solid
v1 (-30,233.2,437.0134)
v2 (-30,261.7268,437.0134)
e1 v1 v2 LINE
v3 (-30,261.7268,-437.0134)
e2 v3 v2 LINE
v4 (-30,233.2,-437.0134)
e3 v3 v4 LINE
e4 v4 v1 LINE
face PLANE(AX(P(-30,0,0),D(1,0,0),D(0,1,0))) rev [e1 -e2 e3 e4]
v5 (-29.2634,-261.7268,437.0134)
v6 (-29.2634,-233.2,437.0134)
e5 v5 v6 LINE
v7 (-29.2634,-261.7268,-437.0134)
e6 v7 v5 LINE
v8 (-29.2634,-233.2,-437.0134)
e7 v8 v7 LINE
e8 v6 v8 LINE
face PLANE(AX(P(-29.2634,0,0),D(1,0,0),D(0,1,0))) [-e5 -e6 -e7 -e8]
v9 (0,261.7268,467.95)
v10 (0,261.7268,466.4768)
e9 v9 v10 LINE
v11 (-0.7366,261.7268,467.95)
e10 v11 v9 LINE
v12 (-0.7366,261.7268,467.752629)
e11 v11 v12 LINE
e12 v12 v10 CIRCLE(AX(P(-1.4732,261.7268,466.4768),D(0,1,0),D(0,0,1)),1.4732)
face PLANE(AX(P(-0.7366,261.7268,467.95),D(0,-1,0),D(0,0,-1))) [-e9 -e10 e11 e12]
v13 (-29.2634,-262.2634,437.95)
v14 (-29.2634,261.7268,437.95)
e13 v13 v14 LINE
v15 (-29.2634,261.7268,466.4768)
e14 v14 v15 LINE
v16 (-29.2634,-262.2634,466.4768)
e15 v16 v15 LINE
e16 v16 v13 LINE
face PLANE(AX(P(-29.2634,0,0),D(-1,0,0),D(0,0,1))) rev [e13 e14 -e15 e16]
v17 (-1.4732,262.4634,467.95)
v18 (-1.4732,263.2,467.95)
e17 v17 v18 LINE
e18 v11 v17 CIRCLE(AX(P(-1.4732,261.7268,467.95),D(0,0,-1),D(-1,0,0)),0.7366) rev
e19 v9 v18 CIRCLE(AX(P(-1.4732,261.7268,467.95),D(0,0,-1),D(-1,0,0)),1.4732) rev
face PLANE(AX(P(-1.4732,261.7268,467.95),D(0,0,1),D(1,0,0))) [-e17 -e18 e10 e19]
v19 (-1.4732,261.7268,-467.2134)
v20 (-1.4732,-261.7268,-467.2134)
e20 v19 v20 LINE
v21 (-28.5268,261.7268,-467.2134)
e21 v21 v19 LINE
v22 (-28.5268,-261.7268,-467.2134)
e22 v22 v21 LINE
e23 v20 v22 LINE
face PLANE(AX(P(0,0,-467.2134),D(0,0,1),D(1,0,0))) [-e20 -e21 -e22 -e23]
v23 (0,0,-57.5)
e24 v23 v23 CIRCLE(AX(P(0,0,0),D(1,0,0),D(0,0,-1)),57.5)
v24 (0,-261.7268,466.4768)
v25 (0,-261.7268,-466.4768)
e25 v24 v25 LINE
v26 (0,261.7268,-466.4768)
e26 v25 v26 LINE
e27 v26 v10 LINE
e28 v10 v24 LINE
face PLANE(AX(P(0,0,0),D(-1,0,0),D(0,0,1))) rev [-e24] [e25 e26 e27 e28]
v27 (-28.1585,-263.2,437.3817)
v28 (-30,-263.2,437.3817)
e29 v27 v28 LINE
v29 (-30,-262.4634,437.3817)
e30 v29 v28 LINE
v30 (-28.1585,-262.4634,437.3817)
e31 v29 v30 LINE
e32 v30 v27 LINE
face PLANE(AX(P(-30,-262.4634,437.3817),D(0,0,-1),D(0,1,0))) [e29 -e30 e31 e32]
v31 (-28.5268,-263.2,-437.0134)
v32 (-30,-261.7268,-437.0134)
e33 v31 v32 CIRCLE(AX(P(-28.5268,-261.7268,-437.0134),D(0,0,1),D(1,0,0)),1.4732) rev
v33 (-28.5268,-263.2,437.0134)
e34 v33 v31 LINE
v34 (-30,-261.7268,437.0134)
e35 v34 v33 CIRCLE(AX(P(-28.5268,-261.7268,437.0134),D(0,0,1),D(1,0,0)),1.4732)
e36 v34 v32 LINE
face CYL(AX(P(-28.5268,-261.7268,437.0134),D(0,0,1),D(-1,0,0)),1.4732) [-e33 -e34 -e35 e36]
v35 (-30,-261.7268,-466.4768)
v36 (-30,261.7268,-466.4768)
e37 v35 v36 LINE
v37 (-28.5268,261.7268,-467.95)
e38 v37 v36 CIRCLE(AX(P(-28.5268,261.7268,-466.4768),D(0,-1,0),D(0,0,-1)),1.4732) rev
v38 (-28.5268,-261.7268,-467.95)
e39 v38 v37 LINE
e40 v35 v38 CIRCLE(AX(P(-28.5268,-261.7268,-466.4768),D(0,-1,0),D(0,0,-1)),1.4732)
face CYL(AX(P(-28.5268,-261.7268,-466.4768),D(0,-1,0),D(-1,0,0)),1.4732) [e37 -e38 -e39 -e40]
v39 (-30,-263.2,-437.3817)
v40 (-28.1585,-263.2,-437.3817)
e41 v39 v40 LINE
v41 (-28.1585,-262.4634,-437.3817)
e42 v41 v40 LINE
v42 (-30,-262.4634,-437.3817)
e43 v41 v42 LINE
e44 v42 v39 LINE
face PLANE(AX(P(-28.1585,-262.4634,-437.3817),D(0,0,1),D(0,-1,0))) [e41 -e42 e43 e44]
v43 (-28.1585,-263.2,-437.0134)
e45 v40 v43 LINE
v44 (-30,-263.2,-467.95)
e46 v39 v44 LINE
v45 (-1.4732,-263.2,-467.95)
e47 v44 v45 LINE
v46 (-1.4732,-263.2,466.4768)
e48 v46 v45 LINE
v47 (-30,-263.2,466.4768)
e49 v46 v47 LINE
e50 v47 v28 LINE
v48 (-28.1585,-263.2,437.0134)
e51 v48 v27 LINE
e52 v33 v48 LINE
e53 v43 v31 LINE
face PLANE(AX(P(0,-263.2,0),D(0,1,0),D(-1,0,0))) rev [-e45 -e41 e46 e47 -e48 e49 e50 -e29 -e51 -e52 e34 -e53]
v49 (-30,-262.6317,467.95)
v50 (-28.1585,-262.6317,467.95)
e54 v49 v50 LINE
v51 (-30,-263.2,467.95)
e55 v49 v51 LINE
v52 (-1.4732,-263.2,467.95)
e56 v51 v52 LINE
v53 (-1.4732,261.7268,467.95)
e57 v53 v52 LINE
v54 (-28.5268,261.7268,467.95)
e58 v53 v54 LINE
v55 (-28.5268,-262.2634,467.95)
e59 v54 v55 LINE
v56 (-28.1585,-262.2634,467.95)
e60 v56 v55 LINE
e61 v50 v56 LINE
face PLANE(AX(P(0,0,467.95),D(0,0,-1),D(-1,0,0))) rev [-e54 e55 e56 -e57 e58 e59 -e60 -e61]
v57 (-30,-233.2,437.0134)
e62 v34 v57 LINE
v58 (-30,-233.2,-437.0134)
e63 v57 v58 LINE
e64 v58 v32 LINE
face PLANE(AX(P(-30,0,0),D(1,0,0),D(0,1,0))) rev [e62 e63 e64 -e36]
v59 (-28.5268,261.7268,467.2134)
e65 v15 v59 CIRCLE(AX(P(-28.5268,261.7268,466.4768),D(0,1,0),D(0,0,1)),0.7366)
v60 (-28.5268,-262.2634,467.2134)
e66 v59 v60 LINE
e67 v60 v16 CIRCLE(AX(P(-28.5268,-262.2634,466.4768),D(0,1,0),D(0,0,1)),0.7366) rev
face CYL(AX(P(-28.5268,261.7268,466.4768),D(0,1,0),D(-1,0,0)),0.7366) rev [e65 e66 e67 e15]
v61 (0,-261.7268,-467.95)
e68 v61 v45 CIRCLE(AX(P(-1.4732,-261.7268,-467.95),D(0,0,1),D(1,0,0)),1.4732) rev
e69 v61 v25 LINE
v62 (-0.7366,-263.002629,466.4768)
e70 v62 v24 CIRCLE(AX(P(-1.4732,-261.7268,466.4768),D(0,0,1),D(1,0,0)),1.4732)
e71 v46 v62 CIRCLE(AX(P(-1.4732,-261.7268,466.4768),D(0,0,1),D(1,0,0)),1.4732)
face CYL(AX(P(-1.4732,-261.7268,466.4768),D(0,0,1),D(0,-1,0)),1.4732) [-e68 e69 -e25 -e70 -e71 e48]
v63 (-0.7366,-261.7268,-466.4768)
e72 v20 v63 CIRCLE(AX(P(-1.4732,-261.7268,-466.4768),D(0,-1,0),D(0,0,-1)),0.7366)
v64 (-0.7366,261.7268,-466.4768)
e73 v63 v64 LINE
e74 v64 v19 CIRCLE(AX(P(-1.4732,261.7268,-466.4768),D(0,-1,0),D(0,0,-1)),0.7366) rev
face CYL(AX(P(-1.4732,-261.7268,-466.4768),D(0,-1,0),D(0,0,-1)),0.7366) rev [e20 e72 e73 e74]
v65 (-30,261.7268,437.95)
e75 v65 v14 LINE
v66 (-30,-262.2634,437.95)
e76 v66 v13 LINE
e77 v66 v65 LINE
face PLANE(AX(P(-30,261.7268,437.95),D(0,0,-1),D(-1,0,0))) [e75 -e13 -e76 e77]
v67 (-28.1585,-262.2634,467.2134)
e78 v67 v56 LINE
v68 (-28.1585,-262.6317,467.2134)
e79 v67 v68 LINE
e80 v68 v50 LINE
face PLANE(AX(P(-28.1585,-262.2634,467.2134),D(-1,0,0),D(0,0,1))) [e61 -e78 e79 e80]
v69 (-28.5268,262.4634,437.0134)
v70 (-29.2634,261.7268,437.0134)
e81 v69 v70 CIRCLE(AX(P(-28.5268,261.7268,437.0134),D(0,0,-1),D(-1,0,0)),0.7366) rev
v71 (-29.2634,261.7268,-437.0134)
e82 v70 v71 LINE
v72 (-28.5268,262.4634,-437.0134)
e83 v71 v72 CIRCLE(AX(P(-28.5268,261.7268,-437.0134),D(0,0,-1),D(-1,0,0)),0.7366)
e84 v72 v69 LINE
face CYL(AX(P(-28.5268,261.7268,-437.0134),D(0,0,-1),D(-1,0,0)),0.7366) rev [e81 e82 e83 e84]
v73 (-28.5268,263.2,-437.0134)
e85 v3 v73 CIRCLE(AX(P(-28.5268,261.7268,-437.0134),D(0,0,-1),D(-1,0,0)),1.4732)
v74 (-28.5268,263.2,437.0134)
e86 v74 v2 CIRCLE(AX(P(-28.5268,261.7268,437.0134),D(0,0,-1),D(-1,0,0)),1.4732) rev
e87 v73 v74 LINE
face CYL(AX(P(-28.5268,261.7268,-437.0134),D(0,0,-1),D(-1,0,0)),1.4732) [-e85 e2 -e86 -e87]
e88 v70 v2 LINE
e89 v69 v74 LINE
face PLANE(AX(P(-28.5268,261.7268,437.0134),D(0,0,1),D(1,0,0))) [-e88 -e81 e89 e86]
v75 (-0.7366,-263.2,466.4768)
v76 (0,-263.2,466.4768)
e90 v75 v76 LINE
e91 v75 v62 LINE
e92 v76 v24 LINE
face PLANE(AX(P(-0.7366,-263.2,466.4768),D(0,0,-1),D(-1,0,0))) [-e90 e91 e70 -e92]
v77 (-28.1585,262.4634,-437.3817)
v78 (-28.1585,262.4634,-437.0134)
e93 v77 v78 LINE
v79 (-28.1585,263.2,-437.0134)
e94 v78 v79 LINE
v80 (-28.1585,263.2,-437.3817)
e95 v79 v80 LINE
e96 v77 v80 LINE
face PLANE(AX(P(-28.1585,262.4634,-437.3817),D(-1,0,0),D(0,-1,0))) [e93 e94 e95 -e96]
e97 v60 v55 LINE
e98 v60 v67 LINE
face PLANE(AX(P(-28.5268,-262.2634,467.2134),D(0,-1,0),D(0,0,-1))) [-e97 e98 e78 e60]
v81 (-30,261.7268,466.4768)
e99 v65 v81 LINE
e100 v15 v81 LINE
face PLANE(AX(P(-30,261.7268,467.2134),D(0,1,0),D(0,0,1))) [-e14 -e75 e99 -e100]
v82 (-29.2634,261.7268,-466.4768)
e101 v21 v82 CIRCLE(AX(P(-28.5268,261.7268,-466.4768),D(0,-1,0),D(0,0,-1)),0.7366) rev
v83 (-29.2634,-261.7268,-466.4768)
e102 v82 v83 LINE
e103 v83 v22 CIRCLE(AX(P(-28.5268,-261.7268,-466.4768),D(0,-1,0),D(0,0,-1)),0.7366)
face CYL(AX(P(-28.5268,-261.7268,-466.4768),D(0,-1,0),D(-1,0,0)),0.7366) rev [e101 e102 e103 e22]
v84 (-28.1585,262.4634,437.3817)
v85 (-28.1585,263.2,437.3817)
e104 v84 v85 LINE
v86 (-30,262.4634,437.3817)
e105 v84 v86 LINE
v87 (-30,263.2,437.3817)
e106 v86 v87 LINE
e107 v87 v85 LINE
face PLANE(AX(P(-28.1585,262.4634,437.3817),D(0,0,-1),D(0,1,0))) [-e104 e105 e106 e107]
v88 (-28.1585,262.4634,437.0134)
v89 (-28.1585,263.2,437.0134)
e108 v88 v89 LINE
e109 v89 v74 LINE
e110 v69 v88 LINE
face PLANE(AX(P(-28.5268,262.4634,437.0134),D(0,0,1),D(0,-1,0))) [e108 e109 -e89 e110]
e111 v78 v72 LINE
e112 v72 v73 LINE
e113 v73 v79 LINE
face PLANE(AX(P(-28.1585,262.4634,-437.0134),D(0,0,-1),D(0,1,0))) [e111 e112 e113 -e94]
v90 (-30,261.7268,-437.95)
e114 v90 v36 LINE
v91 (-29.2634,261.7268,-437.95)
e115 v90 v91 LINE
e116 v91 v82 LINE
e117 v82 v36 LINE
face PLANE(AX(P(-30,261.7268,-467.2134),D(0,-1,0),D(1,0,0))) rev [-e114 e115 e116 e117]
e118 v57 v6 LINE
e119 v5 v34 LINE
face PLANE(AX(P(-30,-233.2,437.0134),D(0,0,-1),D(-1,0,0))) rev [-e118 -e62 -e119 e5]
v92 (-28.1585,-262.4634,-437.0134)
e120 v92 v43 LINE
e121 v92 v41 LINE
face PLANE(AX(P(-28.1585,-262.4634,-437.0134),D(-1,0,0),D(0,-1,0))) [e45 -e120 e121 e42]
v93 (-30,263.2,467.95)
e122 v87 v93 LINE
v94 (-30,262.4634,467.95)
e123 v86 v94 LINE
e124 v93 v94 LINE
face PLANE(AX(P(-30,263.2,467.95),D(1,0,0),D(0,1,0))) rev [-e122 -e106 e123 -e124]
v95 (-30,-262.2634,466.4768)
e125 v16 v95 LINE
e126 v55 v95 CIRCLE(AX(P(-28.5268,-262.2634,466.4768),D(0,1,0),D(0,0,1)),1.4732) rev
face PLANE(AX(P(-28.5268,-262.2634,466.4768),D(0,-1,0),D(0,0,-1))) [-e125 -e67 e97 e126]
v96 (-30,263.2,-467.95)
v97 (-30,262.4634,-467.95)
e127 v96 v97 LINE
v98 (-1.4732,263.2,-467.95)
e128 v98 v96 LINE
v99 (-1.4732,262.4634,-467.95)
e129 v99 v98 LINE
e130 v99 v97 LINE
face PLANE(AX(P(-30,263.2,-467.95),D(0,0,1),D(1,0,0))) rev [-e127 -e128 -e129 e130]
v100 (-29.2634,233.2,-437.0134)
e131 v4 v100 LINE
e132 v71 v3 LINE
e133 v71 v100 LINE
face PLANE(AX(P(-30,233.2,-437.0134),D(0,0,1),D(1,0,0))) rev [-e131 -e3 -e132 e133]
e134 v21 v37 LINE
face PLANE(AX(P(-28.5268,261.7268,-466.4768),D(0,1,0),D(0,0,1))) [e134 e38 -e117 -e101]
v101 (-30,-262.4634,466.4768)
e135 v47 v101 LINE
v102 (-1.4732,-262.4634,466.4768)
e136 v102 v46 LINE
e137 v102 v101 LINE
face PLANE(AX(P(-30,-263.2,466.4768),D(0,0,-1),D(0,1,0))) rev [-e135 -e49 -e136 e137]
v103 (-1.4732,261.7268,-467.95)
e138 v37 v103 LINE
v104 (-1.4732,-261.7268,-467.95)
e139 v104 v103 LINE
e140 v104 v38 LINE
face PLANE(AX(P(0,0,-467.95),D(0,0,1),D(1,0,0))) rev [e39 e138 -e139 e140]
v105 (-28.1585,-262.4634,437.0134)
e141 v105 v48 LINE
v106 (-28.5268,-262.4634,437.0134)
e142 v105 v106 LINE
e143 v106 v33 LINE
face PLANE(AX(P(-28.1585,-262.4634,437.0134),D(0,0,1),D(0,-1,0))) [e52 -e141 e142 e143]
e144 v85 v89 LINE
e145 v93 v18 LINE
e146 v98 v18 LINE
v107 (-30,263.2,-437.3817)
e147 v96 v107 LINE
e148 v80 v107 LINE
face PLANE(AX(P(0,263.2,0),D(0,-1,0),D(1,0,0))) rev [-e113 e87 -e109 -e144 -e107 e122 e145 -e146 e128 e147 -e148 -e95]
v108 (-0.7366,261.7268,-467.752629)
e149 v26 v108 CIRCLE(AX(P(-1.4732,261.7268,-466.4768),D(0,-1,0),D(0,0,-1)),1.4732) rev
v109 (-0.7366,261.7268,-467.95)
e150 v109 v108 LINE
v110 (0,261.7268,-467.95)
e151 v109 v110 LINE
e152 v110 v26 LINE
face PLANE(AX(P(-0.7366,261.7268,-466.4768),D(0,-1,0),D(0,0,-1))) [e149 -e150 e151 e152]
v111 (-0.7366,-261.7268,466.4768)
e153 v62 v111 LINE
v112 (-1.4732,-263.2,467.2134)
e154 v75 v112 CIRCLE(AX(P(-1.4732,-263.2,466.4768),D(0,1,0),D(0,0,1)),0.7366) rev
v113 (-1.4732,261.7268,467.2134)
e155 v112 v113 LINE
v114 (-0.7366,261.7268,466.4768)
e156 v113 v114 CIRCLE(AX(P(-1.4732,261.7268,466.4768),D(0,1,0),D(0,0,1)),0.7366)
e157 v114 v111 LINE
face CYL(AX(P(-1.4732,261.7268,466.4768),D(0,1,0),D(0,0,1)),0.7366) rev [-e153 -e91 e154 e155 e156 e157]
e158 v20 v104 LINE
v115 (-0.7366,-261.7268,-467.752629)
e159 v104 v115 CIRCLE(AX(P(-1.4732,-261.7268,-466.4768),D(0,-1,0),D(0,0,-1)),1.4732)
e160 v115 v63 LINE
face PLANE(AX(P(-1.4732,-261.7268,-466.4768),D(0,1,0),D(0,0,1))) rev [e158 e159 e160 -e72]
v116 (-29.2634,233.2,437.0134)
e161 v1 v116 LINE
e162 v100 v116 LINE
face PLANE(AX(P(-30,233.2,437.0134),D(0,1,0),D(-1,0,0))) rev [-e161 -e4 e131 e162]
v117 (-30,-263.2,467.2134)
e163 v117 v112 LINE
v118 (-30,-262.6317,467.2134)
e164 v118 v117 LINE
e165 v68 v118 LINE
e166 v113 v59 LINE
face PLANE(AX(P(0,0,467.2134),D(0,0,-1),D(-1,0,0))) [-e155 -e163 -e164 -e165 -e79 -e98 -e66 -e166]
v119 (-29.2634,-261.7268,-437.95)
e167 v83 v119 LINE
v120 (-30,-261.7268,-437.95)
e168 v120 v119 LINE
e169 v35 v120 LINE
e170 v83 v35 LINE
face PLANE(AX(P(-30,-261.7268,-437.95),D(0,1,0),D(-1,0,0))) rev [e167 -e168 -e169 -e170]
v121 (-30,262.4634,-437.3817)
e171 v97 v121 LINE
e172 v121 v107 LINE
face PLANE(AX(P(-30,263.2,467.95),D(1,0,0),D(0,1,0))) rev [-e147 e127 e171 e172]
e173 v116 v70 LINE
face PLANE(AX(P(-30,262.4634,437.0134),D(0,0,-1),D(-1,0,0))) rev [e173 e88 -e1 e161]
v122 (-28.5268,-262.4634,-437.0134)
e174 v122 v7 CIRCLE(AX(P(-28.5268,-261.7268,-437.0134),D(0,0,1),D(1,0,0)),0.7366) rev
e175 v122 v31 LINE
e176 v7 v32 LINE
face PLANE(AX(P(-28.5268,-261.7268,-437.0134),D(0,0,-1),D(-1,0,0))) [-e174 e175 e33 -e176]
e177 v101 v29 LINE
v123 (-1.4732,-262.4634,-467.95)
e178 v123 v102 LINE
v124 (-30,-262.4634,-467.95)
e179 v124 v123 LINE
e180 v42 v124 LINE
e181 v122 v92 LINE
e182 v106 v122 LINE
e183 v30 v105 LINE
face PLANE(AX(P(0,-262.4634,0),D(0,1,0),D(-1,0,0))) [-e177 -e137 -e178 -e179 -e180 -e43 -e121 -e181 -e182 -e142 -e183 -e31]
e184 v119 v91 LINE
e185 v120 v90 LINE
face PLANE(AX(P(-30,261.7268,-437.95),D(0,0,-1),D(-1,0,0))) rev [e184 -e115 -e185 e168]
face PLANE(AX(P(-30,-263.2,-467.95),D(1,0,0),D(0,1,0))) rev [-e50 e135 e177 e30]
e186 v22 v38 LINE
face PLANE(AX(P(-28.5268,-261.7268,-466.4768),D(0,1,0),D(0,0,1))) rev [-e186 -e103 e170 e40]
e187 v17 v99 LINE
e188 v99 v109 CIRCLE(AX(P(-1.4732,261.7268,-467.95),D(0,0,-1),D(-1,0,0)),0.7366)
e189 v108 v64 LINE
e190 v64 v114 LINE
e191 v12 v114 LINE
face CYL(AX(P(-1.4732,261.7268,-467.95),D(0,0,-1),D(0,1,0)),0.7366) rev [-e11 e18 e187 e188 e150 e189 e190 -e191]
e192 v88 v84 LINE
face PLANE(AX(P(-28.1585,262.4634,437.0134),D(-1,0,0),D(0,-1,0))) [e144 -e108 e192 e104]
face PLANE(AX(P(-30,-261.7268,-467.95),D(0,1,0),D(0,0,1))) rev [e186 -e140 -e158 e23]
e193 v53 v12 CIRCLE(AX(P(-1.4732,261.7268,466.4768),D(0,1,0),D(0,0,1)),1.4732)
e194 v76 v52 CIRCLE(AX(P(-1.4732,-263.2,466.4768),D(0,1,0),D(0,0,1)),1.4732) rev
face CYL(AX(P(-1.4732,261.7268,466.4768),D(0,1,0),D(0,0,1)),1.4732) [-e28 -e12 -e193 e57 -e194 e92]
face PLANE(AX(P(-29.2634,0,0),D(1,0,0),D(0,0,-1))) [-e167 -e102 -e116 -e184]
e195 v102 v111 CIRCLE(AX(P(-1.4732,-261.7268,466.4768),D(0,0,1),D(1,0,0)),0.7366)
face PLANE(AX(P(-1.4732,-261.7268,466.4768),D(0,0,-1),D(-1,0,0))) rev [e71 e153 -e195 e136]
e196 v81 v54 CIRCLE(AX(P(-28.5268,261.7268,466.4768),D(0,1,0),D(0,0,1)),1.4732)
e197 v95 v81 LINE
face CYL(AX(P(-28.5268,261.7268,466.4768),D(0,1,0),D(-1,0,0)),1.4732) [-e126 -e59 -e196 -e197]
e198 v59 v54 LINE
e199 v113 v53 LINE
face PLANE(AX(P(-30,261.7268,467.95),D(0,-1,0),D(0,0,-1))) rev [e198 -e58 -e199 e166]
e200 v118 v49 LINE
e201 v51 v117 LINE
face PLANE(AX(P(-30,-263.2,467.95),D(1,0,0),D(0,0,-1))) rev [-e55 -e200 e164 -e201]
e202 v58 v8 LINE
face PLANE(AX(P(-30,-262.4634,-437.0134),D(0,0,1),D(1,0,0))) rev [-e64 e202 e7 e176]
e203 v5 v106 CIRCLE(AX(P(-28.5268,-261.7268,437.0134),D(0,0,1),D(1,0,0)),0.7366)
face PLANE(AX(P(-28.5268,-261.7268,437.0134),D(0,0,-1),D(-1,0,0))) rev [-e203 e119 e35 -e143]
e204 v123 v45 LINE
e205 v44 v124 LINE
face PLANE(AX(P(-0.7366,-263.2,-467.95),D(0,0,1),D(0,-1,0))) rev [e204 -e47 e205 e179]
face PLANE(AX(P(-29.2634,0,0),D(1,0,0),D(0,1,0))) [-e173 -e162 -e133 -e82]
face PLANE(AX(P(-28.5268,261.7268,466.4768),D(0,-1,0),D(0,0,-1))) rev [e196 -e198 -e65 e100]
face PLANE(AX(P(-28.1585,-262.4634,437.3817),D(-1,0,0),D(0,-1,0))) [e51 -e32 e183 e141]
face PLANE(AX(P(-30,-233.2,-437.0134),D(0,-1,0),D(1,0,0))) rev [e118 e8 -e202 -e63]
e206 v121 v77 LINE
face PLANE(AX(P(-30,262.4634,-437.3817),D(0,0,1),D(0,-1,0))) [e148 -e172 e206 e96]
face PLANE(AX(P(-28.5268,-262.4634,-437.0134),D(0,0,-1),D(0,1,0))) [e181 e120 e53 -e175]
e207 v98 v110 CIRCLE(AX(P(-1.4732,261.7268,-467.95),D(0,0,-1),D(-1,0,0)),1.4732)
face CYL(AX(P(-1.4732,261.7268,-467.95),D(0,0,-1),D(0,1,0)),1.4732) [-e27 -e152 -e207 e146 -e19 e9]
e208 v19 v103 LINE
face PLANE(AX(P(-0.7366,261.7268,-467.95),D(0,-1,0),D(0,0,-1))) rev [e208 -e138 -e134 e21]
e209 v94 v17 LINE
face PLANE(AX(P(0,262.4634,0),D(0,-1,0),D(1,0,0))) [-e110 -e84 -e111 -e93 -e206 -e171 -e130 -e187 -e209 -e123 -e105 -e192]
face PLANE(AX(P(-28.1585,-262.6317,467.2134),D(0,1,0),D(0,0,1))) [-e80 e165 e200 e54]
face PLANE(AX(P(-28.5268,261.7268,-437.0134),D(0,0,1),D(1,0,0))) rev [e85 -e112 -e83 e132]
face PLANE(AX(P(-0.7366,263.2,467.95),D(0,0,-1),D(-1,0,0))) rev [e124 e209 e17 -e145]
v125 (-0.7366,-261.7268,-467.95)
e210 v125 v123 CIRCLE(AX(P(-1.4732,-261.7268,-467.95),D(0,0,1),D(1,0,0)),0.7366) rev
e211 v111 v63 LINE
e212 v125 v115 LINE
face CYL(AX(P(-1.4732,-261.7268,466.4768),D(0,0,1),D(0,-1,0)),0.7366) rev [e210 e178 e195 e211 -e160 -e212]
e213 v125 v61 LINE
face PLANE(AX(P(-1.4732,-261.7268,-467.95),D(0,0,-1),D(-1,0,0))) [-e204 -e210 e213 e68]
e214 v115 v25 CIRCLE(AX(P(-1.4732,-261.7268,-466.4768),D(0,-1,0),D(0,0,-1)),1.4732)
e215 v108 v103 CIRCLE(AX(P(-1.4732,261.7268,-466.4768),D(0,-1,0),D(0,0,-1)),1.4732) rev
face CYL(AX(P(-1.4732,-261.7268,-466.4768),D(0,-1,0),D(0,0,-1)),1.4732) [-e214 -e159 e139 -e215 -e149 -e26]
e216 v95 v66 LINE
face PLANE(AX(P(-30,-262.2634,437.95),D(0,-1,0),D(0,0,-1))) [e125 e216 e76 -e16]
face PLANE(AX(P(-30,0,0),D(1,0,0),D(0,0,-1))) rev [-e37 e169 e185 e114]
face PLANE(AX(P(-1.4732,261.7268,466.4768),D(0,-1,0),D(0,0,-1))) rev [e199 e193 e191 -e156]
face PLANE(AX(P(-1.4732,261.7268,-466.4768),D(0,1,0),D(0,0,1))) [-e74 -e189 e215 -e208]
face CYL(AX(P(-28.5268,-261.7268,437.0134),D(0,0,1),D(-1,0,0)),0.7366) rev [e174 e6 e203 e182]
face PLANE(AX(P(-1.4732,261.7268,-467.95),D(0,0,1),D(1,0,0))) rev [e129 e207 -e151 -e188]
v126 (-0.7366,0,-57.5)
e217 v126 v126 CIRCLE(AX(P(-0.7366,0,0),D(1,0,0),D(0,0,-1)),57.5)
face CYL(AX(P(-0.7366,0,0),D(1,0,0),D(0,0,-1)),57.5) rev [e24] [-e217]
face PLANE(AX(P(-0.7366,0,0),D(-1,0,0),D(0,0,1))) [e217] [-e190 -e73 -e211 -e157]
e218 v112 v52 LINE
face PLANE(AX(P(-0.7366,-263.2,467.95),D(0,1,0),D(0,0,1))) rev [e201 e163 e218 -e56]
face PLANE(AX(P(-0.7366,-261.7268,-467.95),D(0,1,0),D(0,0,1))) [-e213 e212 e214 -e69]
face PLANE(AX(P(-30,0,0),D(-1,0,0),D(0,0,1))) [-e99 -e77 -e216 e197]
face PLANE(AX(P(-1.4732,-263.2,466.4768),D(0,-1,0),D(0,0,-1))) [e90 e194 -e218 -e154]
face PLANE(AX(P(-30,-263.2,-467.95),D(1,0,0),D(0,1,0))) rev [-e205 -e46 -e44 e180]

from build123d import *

# Parameters (mm, degrees)
SKETCH1_W                     = 935.9
SKETCH1_H                     = 526.4
SKETCH1_R                     = 57.5
BASE_FLANGE1_DEPTH            = 0.7366
EDGE_FLANGE1_STRIP_W          = 4.4196
EDGE_FLANGE1_STRIP_H          = 0.7366
EDGE_FLANGE1_STRIP_CUT_DEPTH  = 935.9
EDGE_FLANGE1_DEPTH            = 935.9
EDGE_FLANGE2_STRIP_W          = 4.4196
EDGE_FLANGE2_STRIP_H          = 0.7366
EDGE_FLANGE2_STRIP_CUT_DEPTH  = 524.9268
EDGE_FLANGE2_DEPTH            = 524.9268
EDGE_FLANGE3_STRIP_W          = 4.4196
EDGE_FLANGE3_STRIP_H          = 0.7366
EDGE_FLANGE3_STRIP_CUT_DEPTH  = 934.4268
EDGE_FLANGE3_DEPTH            = 934.4268
EDGE_FLANGE4_STRIP_W          = 4.4196
EDGE_FLANGE4_STRIP_H          = 0.7366
EDGE_FLANGE4_STRIP_CUT_DEPTH  = 523.4536
EDGE_FLANGE4_DEPTH            = 523.4536
EDGE_FLANGE5_STRIP_W          = 4.4196
EDGE_FLANGE5_STRIP_H          = 0.7366
EDGE_FLANGE5_STRIP_CUT_DEPTH  = 874.0268
EDGE_FLANGE5_RELIEF_W         = 4.7879
EDGE_FLANGE5_RELIEF_H         = 0.3683
EDGE_FLANGE5_RELIEF_CUT_DEPTH = 0.7366
EDGE_FLANGE5_DEPTH            = 874.0268
EDGE_FLANGE6_STRIP_W          = 4.4196
EDGE_FLANGE6_STRIP_H          = 0.7366
EDGE_FLANGE6_STRIP_CUT_DEPTH  = 874.0268
EDGE_FLANGE6_RELIEF_W         = 4.7879
EDGE_FLANGE6_RELIEF_H         = 0.3683
EDGE_FLANGE6_RELIEF_CUT_DEPTH = 0.7366
EDGE_FLANGE6_DEPTH            = 874.0268
EDGE_FLANGE7_STRIP_W          = 4.4196
EDGE_FLANGE7_STRIP_H          = 0.7366
EDGE_FLANGE7_STRIP_CUT_DEPTH  = 523.4536
EDGE_FLANGE7_DEPTH            = 523.4536
EDGE_FLANGE8_STRIP_W          = 4.4196
EDGE_FLANGE8_STRIP_H          = 0.7366
EDGE_FLANGE8_STRIP_CUT_DEPTH  = 523.9902
EDGE_FLANGE8_RELIEF_W         = 4.7879
EDGE_FLANGE8_RELIEF_H         = 0.3683
EDGE_FLANGE8_RELIEF_CUT_DEPTH = 0.7366
EDGE_FLANGE8_DEPTH            = 523.9902


# Sheet-metal steps are written as plain solids
with BuildPart() as part:
    # Sketch1 → Base-Flange1 (new body)
    with BuildSketch(Plane(origin=(0, 0, 0), x_dir=(0, 0, -1), z_dir=(1, 0, 0))):
        Rectangle(SKETCH1_W, SKETCH1_H)
        Circle(SKETCH1_R, mode=Mode.SUBTRACT)
    extrude(amount=-BASE_FLANGE1_DEPTH)

    # Edge-Flange1 strip (across the edge) → Edge-Flange1 strip cut (cut)
    with BuildSketch(Plane(origin=(-0.7366, 263.2, 467.95), x_dir=(0, -1, 0), z_dir=(0, 0, -1))):
        with Locations((-0.7366, -0.3683)):
            Rectangle(EDGE_FLANGE1_STRIP_W, EDGE_FLANGE1_STRIP_H)
    extrude(amount=EDGE_FLANGE1_STRIP_CUT_DEPTH, mode=Mode.SUBTRACT)

    # Edge-Flange1 section (across the edge) → Edge-Flange1 (add)
    with BuildSketch(Plane(origin=(-0.7366, 263.2, 467.95), x_dir=(0, -1, 0), z_dir=(0, 0, -1))):
        with BuildLine():
            Line((0, 0.7366), (0, 29.2634))
            Line((0, 29.2634), (0.7366, 29.2634))
            Line((0.7366, 29.2634), (0.7366, 0.7366))
            ThreePointArc((0.7366, 0.7366), (0.952345145, 0.215745145), (1.4732, 0))
            Line((1.4732, 0), (1.4732, -0.7366))
            ThreePointArc((1.4732, -0.7366), (0.43149029, -0.30510971), (0, 0.7366))
        make_face()
    extrude(amount=EDGE_FLANGE1_DEPTH)

    # Edge-Flange2 strip (across the edge) → Edge-Flange2 strip cut (cut)
    with BuildSketch(Plane(origin=(-0.7366, -263.2, 467.95), x_dir=(0, 0, -1), z_dir=(0, 1, 0))):
        with Locations((-0.7366, -0.3683)):
            Rectangle(EDGE_FLANGE2_STRIP_W, EDGE_FLANGE2_STRIP_H)
    extrude(amount=EDGE_FLANGE2_STRIP_CUT_DEPTH, mode=Mode.SUBTRACT)

    # Edge-Flange2 section (across the edge) → Edge-Flange2 (add)
    with BuildSketch(Plane(origin=(-0.7366, -263.2, 467.95), x_dir=(0, 0, -1), z_dir=(0, 1, 0))):
        with BuildLine():
            Line((0, 0.7366), (0, 29.2634))
            Line((0, 29.2634), (0.7366, 29.2634))
            Line((0.7366, 29.2634), (0.7366, 0.7366))
            ThreePointArc((0.7366, 0.7366), (0.952345145, 0.215745145), (1.4732, 0))
            Line((1.4732, 0), (1.4732, -0.7366))
            ThreePointArc((1.4732, -0.7366), (0.43149029, -0.30510971), (0, 0.7366))
        make_face()
    extrude(amount=EDGE_FLANGE2_DEPTH)

    # Edge-Flange3 strip (across the edge) → Edge-Flange3 strip cut (cut)
    with BuildSketch(Plane(origin=(-0.7366, -263.2, -467.95), x_dir=(0, 1, 0), z_dir=(0, 0, 1))):
        with Locations((-0.7366, -0.3683)):
            Rectangle(EDGE_FLANGE3_STRIP_W, EDGE_FLANGE3_STRIP_H)
    extrude(amount=EDGE_FLANGE3_STRIP_CUT_DEPTH, mode=Mode.SUBTRACT)

    # Edge-Flange3 section (across the edge) → Edge-Flange3 (add)
    with BuildSketch(Plane(origin=(-0.7366, -263.2, -467.95), x_dir=(0, 1, 0), z_dir=(0, 0, 1))):
        with BuildLine():
            Line((0, 0.7366), (0, 29.2634))
            Line((0, 29.2634), (0.7366, 29.2634))
            Line((0.7366, 29.2634), (0.7366, 0.7366))
            ThreePointArc((0.7366, 0.7366), (0.952345145, 0.215745145), (1.4732, 0))
            Line((1.4732, 0), (1.4732, -0.7366))
            ThreePointArc((1.4732, -0.7366), (0.43149029, -0.30510971), (0, 0.7366))
        make_face()
    extrude(amount=EDGE_FLANGE3_DEPTH)

    # Edge-Flange4 strip (across the edge) → Edge-Flange4 strip cut (cut)
    with BuildSketch(Plane(origin=(-0.7366, 261.7268, -467.95), x_dir=(0, 0, 1), z_dir=(0, -1, 0))):
        with Locations((-0.7366, -0.3683)):
            Rectangle(EDGE_FLANGE4_STRIP_W, EDGE_FLANGE4_STRIP_H)
    extrude(amount=EDGE_FLANGE4_STRIP_CUT_DEPTH, mode=Mode.SUBTRACT)

    # Edge-Flange4 section (across the edge) → Edge-Flange4 (add)
    with BuildSketch(Plane(origin=(-0.7366, 261.7268, -467.95), x_dir=(0, 0, 1), z_dir=(0, -1, 0))):
        with BuildLine():
            Line((0, 0.7366), (0, 29.2634))
            Line((0, 29.2634), (0.7366, 29.2634))
            Line((0.7366, 29.2634), (0.7366, 0.7366))
            ThreePointArc((0.7366, 0.7366), (0.952345145, 0.215745145), (1.4732, 0))
            Line((1.4732, 0), (1.4732, -0.7366))
            ThreePointArc((1.4732, -0.7366), (0.43149029, -0.30510971), (0, 0.7366))
        make_face()
    extrude(amount=EDGE_FLANGE4_DEPTH)

    # Edge-Flange5 strip (across the edge) → Edge-Flange5 strip cut (cut)
    with BuildSketch(Plane(origin=(-30, 262.4634, 437.0134), x_dir=(1, 0, 0), z_dir=(0, 0, -1))):
        with Locations((-0.7366, -0.3683)):
            Rectangle(EDGE_FLANGE5_STRIP_W, EDGE_FLANGE5_STRIP_H)
    extrude(amount=EDGE_FLANGE5_STRIP_CUT_DEPTH, mode=Mode.SUBTRACT)

    # Edge-Flange5 relief (on the sheet) → Edge-Flange5 relief cut (cut)
    with BuildSketch(Plane(origin=(-28.5268, 262.4634, 437.0134), x_dir=(1, 0, 0), z_dir=(0, -1, 0))):
        with Locations((-2.02565, 0.18415)):
            Rectangle(EDGE_FLANGE5_RELIEF_W, EDGE_FLANGE5_RELIEF_H)
        with Locations((-2.02565, -874.21095)):
            Rectangle(EDGE_FLANGE5_RELIEF_W, EDGE_FLANGE5_RELIEF_H)
    extrude(amount=-EDGE_FLANGE5_RELIEF_CUT_DEPTH, mode=Mode.SUBTRACT)

    # Edge-Flange5 section (across the edge) → Edge-Flange5 (add)
    with BuildSketch(Plane(origin=(-30, 262.4634, 437.0134), x_dir=(1, 0, 0), z_dir=(0, 0, -1))):
        with BuildLine():
            Line((0, 0.7366), (0, 29.2634))
            Line((0, 29.2634), (0.7366, 29.2634))
            Line((0.7366, 29.2634), (0.7366, 0.7366))
            ThreePointArc((0.7366, 0.7366), (0.952345145, 0.215745145), (1.4732, 0))
            Line((1.4732, 0), (1.4732, -0.7366))
            ThreePointArc((1.4732, -0.7366), (0.43149029, -0.30510971), (0, 0.7366))
        make_face()
    extrude(amount=EDGE_FLANGE5_DEPTH)

    # Edge-Flange6 strip (across the edge) → Edge-Flange6 strip cut (cut)
    with BuildSketch(Plane(origin=(-30, -262.4634, -437.0134), x_dir=(1, 0, 0), z_dir=(0, 0, 1))):
        with Locations((-0.7366, -0.3683)):
            Rectangle(EDGE_FLANGE6_STRIP_W, EDGE_FLANGE6_STRIP_H)
    extrude(amount=EDGE_FLANGE6_STRIP_CUT_DEPTH, mode=Mode.SUBTRACT)

    # Edge-Flange6 relief (on the sheet) → Edge-Flange6 relief cut (cut)
    with BuildSketch(Plane(origin=(-28.5268, -262.4634, -437.0134), x_dir=(1, 0, 0), z_dir=(0, 1, 0))):
        with Locations((-2.02565, 0.18415)):
            Rectangle(EDGE_FLANGE6_RELIEF_W, EDGE_FLANGE6_RELIEF_H)
        with Locations((-2.02565, -874.21095)):
            Rectangle(EDGE_FLANGE6_RELIEF_W, EDGE_FLANGE6_RELIEF_H)
    extrude(amount=-EDGE_FLANGE6_RELIEF_CUT_DEPTH, mode=Mode.SUBTRACT)

    # Edge-Flange6 section (across the edge) → Edge-Flange6 (add)
    with BuildSketch(Plane(origin=(-30, -262.4634, -437.0134), x_dir=(1, 0, 0), z_dir=(0, 0, 1))):
        with BuildLine():
            Line((0, 0.7366), (0, 29.2634))
            Line((0, 29.2634), (0.7366, 29.2634))
            Line((0.7366, 29.2634), (0.7366, 0.7366))
            ThreePointArc((0.7366, 0.7366), (0.952345145, 0.215745145), (1.4732, 0))
            Line((1.4732, 0), (1.4732, -0.7366))
            ThreePointArc((1.4732, -0.7366), (0.43149029, -0.30510971), (0, 0.7366))
        make_face()
    extrude(amount=EDGE_FLANGE6_DEPTH)

    # Edge-Flange7 strip (across the edge) → Edge-Flange7 strip cut (cut)
    with BuildSketch(Plane(origin=(-30, 261.7268, -467.2134), x_dir=(1, 0, 0), z_dir=(0, -1, 0))):
        with Locations((-0.7366, -0.3683)):
            Rectangle(EDGE_FLANGE7_STRIP_W, EDGE_FLANGE7_STRIP_H)
    extrude(amount=EDGE_FLANGE7_STRIP_CUT_DEPTH, mode=Mode.SUBTRACT)

    # Edge-Flange7 section (across the edge) → Edge-Flange7 (add)
    with BuildSketch(Plane(origin=(-30, 261.7268, -467.2134), x_dir=(1, 0, 0), z_dir=(0, -1, 0))):
        with BuildLine():
            Line((0, 0.7366), (0, 29.2634))
            Line((0, 29.2634), (0.7366, 29.2634))
            Line((0.7366, 29.2634), (0.7366, 0.7366))
            ThreePointArc((0.7366, 0.7366), (0.952345145, 0.215745145), (1.4732, 0))
            Line((1.4732, 0), (1.4732, -0.7366))
            ThreePointArc((1.4732, -0.7366), (0.43149029, -0.30510971), (0, 0.7366))
        make_face()
    extrude(amount=EDGE_FLANGE7_DEPTH)

    # Edge-Flange8 strip (across the edge) → Edge-Flange8 strip cut (cut)
    with BuildSketch(Plane(origin=(-30, -262.2634, 467.2134), x_dir=(1, 0, 0), z_dir=(0, 1, 0))):
        with Locations((-0.7366, -0.3683)):
            Rectangle(EDGE_FLANGE8_STRIP_W, EDGE_FLANGE8_STRIP_H)
    extrude(amount=EDGE_FLANGE8_STRIP_CUT_DEPTH, mode=Mode.SUBTRACT)

    # Edge-Flange8 relief (on the sheet) → Edge-Flange8 relief cut (cut)
    with BuildSketch(Plane(origin=(-28.5268, -262.2634, 467.2134), x_dir=(1, 0, 0), z_dir=(0, 0, -1))):
        with Locations((-2.02565, 0.18415)):
            Rectangle(EDGE_FLANGE8_RELIEF_W, EDGE_FLANGE8_RELIEF_H)
    extrude(amount=-EDGE_FLANGE8_RELIEF_CUT_DEPTH, mode=Mode.SUBTRACT)

    # Edge-Flange8 section (across the edge) → Edge-Flange8 (add)
    with BuildSketch(Plane(origin=(-30, -262.2634, 467.2134), x_dir=(1, 0, 0), z_dir=(0, 1, 0))):
        with BuildLine():
            Line((0, 0.7366), (0, 29.2634))
            Line((0, 29.2634), (0.7366, 29.2634))
            Line((0.7366, 29.2634), (0.7366, 0.7366))
            ThreePointArc((0.7366, 0.7366), (0.952345145, 0.215745145), (1.4732, 0))
            Line((1.4732, 0), (1.4732, -0.7366))
            ThreePointArc((1.4732, -0.7366), (0.43149029, -0.30510971), (0, 0.7366))
        make_face()
    extrude(amount=EDGE_FLANGE8_DEPTH)


solid = part.part
